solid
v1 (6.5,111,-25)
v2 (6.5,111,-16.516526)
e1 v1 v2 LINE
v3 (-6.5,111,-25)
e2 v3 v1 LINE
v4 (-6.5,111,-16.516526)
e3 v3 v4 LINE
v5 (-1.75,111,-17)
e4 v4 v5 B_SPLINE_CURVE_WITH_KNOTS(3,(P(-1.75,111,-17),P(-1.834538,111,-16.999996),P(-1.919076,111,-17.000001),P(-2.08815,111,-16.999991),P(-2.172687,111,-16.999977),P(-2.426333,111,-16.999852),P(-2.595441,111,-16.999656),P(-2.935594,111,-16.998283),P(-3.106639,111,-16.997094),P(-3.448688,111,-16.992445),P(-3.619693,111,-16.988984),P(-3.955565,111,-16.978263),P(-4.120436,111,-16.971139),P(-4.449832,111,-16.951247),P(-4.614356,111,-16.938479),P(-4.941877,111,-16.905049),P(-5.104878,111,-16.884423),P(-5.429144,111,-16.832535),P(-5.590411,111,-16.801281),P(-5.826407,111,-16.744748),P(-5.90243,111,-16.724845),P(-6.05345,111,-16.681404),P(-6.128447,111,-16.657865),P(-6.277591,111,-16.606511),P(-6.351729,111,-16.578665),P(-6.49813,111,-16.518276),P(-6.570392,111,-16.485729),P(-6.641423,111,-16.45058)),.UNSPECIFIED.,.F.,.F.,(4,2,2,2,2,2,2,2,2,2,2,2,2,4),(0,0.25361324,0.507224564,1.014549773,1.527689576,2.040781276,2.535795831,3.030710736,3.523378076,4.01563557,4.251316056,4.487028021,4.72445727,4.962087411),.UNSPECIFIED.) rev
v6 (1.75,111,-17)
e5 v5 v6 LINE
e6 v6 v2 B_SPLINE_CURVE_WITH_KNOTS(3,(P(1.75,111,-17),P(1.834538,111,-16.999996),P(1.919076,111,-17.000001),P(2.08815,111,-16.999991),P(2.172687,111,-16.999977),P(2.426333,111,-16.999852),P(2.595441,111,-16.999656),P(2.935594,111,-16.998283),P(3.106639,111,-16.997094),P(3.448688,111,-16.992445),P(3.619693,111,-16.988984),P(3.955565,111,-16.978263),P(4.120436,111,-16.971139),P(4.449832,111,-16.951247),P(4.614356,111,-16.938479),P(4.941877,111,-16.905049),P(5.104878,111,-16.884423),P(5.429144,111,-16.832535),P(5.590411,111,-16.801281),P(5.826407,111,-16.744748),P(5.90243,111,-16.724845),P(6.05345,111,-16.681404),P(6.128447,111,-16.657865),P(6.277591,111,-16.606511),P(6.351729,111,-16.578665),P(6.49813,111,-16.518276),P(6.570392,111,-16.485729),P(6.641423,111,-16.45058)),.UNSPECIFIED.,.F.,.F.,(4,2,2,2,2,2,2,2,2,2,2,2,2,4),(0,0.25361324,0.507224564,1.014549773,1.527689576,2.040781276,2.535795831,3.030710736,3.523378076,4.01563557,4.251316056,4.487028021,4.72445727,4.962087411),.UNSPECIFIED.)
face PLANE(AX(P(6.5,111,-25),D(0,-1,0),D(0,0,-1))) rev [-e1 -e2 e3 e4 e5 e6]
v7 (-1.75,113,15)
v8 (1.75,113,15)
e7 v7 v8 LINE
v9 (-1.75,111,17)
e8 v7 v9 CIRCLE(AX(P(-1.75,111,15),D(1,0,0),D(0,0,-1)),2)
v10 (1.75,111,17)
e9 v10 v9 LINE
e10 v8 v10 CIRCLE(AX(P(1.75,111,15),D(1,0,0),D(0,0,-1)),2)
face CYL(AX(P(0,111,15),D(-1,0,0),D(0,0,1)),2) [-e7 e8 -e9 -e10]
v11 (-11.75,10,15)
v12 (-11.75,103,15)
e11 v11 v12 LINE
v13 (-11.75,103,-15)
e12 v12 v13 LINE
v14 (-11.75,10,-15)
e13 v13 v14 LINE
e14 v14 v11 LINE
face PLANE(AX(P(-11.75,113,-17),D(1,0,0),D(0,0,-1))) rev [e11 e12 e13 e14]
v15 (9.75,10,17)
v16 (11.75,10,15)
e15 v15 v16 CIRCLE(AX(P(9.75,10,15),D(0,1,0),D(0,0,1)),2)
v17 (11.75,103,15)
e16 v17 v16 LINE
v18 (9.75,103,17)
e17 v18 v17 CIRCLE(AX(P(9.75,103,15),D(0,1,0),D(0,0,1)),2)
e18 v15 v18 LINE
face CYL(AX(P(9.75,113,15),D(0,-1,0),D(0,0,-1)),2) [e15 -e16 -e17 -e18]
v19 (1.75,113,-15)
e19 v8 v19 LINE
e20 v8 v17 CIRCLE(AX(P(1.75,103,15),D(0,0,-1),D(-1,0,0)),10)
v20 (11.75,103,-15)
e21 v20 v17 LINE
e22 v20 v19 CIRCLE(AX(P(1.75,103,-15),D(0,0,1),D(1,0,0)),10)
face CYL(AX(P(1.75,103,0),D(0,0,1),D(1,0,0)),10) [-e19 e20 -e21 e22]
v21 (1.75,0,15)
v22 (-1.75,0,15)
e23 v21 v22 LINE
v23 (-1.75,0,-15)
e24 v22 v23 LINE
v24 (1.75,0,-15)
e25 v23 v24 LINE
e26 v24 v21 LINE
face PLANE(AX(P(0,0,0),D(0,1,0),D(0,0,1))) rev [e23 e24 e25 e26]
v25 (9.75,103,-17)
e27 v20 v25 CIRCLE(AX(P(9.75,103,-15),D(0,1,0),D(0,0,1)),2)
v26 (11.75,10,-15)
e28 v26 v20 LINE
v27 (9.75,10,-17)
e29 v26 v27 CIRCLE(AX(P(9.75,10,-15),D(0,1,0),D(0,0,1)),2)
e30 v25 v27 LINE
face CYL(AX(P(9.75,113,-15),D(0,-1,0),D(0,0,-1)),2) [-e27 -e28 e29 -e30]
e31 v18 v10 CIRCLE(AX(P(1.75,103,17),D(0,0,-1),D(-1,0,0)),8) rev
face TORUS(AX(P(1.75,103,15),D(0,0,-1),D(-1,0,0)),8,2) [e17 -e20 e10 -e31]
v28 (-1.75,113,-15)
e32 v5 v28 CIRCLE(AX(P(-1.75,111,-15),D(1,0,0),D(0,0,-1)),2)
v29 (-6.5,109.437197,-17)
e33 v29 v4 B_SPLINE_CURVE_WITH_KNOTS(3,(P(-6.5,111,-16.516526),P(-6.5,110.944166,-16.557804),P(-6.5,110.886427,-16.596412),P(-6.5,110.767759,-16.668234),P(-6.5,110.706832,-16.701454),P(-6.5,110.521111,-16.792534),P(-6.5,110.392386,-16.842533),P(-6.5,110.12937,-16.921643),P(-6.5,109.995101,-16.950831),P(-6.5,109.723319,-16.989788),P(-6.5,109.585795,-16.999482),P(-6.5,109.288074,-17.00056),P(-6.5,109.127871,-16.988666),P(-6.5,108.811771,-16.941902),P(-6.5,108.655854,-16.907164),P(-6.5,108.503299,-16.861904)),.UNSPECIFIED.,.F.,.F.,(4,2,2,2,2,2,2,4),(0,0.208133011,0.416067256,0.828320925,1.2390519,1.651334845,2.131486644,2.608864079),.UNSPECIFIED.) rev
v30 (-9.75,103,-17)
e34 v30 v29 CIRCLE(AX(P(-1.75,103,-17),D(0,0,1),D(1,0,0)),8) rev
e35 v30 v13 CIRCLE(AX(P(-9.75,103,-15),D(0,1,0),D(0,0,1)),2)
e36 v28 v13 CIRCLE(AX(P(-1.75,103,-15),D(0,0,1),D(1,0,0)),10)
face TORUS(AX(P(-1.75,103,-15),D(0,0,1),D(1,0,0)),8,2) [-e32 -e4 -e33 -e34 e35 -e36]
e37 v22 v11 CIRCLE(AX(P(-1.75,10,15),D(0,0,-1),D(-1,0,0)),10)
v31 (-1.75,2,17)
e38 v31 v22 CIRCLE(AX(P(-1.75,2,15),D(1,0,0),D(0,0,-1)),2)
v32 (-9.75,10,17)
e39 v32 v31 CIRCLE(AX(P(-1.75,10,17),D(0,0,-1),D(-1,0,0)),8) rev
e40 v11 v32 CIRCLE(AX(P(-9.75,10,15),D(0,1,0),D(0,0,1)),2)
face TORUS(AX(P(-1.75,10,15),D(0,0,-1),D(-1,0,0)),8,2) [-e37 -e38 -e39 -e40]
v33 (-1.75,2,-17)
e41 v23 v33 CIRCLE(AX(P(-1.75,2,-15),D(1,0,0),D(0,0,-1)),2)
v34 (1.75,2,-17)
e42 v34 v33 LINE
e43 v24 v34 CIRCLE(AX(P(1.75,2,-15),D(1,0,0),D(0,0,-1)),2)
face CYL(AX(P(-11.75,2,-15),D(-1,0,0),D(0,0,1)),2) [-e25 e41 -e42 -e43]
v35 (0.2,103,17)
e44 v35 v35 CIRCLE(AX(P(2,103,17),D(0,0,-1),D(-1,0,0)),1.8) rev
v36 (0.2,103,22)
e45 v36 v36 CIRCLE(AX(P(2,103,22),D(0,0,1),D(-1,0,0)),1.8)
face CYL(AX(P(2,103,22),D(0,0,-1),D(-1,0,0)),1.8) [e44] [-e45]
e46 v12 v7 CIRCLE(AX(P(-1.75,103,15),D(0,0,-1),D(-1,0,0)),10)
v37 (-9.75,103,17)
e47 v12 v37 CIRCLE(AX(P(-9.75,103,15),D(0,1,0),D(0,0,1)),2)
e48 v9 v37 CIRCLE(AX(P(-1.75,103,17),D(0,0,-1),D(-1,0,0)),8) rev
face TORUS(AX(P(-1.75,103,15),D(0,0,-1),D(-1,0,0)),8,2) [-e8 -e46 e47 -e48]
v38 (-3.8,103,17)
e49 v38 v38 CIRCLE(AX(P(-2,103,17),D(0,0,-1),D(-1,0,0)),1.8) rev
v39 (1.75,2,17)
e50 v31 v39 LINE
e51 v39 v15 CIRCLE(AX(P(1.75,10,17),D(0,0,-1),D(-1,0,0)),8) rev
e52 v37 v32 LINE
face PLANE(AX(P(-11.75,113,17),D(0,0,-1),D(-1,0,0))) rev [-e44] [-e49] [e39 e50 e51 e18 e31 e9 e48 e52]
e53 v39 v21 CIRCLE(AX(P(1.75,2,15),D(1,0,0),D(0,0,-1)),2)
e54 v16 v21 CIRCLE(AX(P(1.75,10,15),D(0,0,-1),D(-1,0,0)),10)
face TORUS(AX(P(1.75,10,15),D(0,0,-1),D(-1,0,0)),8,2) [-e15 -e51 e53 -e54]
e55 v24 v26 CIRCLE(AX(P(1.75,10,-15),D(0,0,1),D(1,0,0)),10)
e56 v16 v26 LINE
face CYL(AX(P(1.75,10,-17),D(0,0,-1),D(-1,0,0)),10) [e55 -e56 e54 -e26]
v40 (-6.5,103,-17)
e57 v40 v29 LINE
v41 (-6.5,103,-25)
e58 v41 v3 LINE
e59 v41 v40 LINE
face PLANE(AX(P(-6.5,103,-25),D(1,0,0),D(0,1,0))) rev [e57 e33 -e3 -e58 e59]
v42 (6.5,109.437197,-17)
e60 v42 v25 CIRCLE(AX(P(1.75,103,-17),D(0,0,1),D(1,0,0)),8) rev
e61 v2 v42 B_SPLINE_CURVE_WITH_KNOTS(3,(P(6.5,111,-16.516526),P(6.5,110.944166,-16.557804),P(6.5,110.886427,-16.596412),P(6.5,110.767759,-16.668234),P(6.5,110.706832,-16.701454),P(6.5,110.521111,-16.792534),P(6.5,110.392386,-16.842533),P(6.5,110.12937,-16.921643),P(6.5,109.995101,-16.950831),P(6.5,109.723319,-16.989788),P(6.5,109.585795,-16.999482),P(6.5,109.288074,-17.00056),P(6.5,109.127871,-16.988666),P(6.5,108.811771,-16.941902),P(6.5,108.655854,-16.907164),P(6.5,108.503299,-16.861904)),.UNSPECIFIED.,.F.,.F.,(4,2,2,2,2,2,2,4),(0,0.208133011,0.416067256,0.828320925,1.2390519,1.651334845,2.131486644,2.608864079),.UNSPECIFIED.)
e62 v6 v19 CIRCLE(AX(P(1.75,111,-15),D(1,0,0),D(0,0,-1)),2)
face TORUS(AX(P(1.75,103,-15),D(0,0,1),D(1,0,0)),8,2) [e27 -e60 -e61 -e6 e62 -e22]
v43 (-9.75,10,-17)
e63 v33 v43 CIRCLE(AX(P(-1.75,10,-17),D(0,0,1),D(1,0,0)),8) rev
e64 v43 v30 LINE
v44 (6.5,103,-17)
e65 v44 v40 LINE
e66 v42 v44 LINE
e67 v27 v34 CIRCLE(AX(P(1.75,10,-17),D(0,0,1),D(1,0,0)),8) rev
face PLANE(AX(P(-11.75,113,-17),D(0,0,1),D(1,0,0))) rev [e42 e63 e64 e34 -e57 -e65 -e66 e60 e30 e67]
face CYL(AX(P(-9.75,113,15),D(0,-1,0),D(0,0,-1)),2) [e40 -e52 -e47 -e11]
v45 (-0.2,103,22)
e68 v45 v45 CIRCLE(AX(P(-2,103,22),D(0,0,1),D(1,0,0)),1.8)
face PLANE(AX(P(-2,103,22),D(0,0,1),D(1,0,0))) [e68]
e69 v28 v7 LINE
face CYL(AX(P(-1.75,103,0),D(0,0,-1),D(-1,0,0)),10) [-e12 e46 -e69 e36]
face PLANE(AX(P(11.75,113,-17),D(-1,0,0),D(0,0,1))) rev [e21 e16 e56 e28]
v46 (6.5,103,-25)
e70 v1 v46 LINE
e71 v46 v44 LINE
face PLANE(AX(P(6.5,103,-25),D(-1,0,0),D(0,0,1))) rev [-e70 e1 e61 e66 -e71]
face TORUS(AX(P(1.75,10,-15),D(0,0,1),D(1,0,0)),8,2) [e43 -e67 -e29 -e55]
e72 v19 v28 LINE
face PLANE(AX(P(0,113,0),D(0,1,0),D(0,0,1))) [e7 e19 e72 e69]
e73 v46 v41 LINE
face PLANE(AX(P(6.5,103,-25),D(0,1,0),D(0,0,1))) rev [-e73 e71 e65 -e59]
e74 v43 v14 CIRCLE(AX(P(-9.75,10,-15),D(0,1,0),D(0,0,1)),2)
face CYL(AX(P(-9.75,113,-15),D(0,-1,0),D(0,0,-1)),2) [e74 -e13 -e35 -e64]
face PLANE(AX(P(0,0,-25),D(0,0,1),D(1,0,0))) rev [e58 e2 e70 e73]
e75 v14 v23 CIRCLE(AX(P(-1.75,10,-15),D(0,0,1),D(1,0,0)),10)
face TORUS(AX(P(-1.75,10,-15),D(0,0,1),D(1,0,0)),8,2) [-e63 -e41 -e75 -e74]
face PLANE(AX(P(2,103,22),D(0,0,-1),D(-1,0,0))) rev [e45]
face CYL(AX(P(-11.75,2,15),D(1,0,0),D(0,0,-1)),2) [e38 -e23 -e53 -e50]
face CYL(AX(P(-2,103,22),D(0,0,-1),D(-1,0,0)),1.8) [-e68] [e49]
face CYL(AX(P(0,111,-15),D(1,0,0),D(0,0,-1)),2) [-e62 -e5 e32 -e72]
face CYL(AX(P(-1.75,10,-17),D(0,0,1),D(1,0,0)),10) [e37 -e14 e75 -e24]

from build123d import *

# Parameters (mm, degrees)
SKETCH_1_W      = 23.5
SKETCH_1_H      = 34
EXTRUDE_1_DEPTH = 113
SKETCH_2_R      = 1.8
EXTRUDE_2_DEPTH = 5
SKETCH_3_W      = 13
SKETCH_3_H      = 8
EXTRUDE_3_DEPTH = 8
FILLET_1_R      = 10
FILLET_2_R      = 2


with BuildPart() as part:
    # ｽｹｯﾁ1 → ﾎﾞｽ - 押し出し1 (new body)
    with BuildSketch(Plane(origin=(0, 0, 0), x_dir=(1, 0, 0), z_dir=(0, 1, 0))):
        Rectangle(SKETCH_1_W, SKETCH_1_H)
    extrude(amount=EXTRUDE_1_DEPTH)

    # ｽｹｯﾁ2 → ﾎﾞｽ - 押し出し2 (add)
    with BuildSketch(Plane.XY.offset(17)):
        with Locations(Location((-2, 103, 0), (0, 0, 180))):
            Circle(SKETCH_2_R)
        with Locations(Location((2, 103, 0), (0, 0, 180))):
            Circle(SKETCH_2_R)
    extrude(amount=EXTRUDE_2_DEPTH)

    # ｽｹｯﾁ3 → ﾎﾞｽ - 押し出し3 (add)
    with BuildSketch(Plane(origin=(0, 0, -17), x_dir=(-1, 0, 0), z_dir=(0, 0, -1))):
        with Locations((0, 107)):
            Rectangle(SKETCH_3_W, SKETCH_3_H)
    extrude(amount=EXTRUDE_3_DEPTH)

    # ﾌｨﾚｯﾄ1
    fillet_1_edges = [part.edges().sort_by_distance(p)[0] for p in [
        (-11.75, 113, 0),
        (11.75, 113, 0),
        (-11.75, 0, 0),
        (11.75, 0, 0),
    ]]
    fillet(fillet_1_edges, radius=FILLET_1_R)

    # ﾌｨﾚｯﾄ2
    # the kernel refuses this fillet: 2 mm, written as the material it takes off along each edge
    with BuildSketch(Plane(origin=(11.75, 10, -17), x_dir=(-1, 0, 0), z_dir=(0, 1, 0)), Plane(origin=(11.75, 10, 17), x_dir=(0, 0, -1), z_dir=(0, 1, 0))) as fillet_2_piece_1:
        with BuildLine():
            CenterArc((FILLET_2_R, FILLET_2_R), FILLET_2_R, 180, 90)
            Line((0, FILLET_2_R), (0, 0))
            Line((0, 0), (FILLET_2_R, 0))
        make_face()
    extrude(amount=93, mode=Mode.SUBTRACT)
    with BuildSketch(Plane(origin=(-1.75, 0, -17), x_dir=(0, 1, 0), z_dir=(1, 0, 0)), Plane(origin=(1.75, 113, 17), x_dir=(0, 0, -1), z_dir=(-1, 0, 0))) as fillet_2_piece_2:
        with BuildLine():
            CenterArc((FILLET_2_R, FILLET_2_R), FILLET_2_R, 180, 90)
            Line((0, FILLET_2_R), (0, 0))
            Line((0, 0), (FILLET_2_R, 0))
        make_face()
    extrude(amount=3.5, mode=Mode.SUBTRACT)
    with BuildSketch(Plane(origin=(-11.75, 10, -17), x_dir=(1, 0, 0), z_dir=(0, 1, 0)), Plane(origin=(-11.75, 10, 17), x_dir=(0, 0, -1), z_dir=(0, 1, 0))) as fillet_2_piece_3:
        with BuildLine():
            CenterArc((FILLET_2_R, -FILLET_2_R), FILLET_2_R, 90, 90)
            Line((0, -FILLET_2_R), (0, 0))
            Line((0, 0), (FILLET_2_R, 0))
        make_face()
    extrude(amount=93, mode=Mode.SUBTRACT)
    with BuildSketch(Plane(origin=(-1.75, 113, -17), x_dir=(0, -1, 0), z_dir=(1, 0, 0)), Plane(origin=(1.75, 0, 17), x_dir=(0, 0, -1), z_dir=(-1, 0, 0))) as fillet_2_piece_4:
        with BuildLine():
            CenterArc((FILLET_2_R, -FILLET_2_R), FILLET_2_R, 90, 90)
            Line((0, -FILLET_2_R), (0, 0))
            Line((0, 0), (FILLET_2_R, 0))
        make_face()
    extrude(amount=3.5, mode=Mode.SUBTRACT)
    with BuildSketch(Plane(origin=(1.75, 103, -17), x_dir=(0, 1, 0), z_dir=(-1, 0, 0))) as fillet_2_piece_5_section:
        with BuildLine():
            CenterArc((10 - FILLET_2_R, -FILLET_2_R), FILLET_2_R, 0, 90)
            Line((10, -FILLET_2_R), (10, 0))
            Line((10, 0), (10 - FILLET_2_R, 0))
        make_face()
    fillet_2_piece_5 = revolve(axis=Axis((1.75, 103, -17), (0, 0, -1)), revolution_arc=90, mode=Mode.PRIVATE)
    fillet_2_piece_5 = split(fillet_2_piece_5, bisect_by=Plane(origin=(4.101759822, 111, -16.527412799), z_dir=(0, 1, 0)), keep=Keep.TOP, mode=Mode.PRIVATE)
    fillet_2_piece_5 = split(fillet_2_piece_5, bisect_by=Plane(origin=(6.5, 112.1945957, -16.527412799), z_dir=(-1, 0, 0)), keep=Keep.TOP, mode=Mode.PRIVATE)
    add(fillet_2_piece_5, mode=Mode.SUBTRACT)
    with BuildSketch(Plane(origin=(1.75, 103, -17), x_dir=(0, 1, 0), z_dir=(-1, 0, 0))) as fillet_2_piece_6_section:
        with BuildLine():
            CenterArc((10 - FILLET_2_R, -FILLET_2_R), FILLET_2_R, 0, 90)
            Line((10, -FILLET_2_R), (10, 0))
            Line((10, 0), (10 - FILLET_2_R, 0))
        make_face()
    fillet_2_piece_6 = revolve(axis=Axis((1.75, 103, -17), (0, 0, -1)), revolution_arc=90, mode=Mode.PRIVATE)
    fillet_2_piece_6 = split(fillet_2_piece_6, bisect_by=Plane(origin=(9.944543227, 111, -16.429177526), z_dir=(0, -1, 0)), keep=Keep.TOP, mode=Mode.PRIVATE)
    fillet_2_piece_6 = split(fillet_2_piece_6, bisect_by=Plane(origin=(6.5, 107.664638262, -16.429177526), z_dir=(1, 0, 0)), keep=Keep.TOP, mode=Mode.PRIVATE)
    add(fillet_2_piece_6, mode=Mode.SUBTRACT)
    with BuildSketch(Plane(origin=(1.75, 103, -17), x_dir=(0, 1, 0), z_dir=(-1, 0, 0))) as fillet_2_piece_7_section:
        with BuildLine():
            CenterArc((10 - FILLET_2_R, -FILLET_2_R), FILLET_2_R, 0, 90)
            Line((10, -FILLET_2_R), (10, 0))
            Line((10, 0), (10 - FILLET_2_R, 0))
        make_face()
    fillet_2_piece_7 = revolve(axis=Axis((1.75, 103, -17), (0, 0, -1)), revolution_arc=90, mode=Mode.PRIVATE)
    fillet_2_piece_7 = split(fillet_2_piece_7, bisect_by=Plane(origin=(6.999362203, 111, -16.337935444), z_dir=(0, 1, 0)), keep=Keep.TOP, mode=Mode.PRIVATE)
    fillet_2_piece_7 = split(fillet_2_piece_7, bisect_by=Plane(origin=(6.5, 111.322531281, -16.337935444), z_dir=(1, 0, 0)), keep=Keep.TOP, mode=Mode.PRIVATE)
    add(fillet_2_piece_7, mode=Mode.SUBTRACT)
    with BuildSketch(Plane(origin=(-1.75, 103, -17), x_dir=(-1, 0, 0), z_dir=(0, -1, 0))) as fillet_2_piece_8_section:
        with BuildLine():
            CenterArc((10 - FILLET_2_R, -FILLET_2_R), FILLET_2_R, 0, 90)
            Line((10, -FILLET_2_R), (10, 0))
            Line((10, 0), (10 - FILLET_2_R, 0))
        make_face()
    fillet_2_piece_8 = revolve(axis=Axis((-1.75, 103, -17), (0, 0, -1)), revolution_arc=90, mode=Mode.PRIVATE)
    fillet_2_piece_8 = split(fillet_2_piece_8, bisect_by=Plane(origin=(-6.5, 107.664638263, -16.429177529), z_dir=(-1, 0, 0)), keep=Keep.TOP, mode=Mode.PRIVATE)
    fillet_2_piece_8 = split(fillet_2_piece_8, bisect_by=Plane(origin=(-9.94454323, 111, -16.429177529), z_dir=(0, -1, 0)), keep=Keep.TOP, mode=Mode.PRIVATE)
    add(fillet_2_piece_8, mode=Mode.SUBTRACT)
    with BuildSketch(Plane(origin=(-1.75, 103, -17), x_dir=(-1, 0, 0), z_dir=(0, -1, 0))) as fillet_2_piece_9_section:
        with BuildLine():
            CenterArc((10 - FILLET_2_R, -FILLET_2_R), FILLET_2_R, 0, 90)
            Line((10, -FILLET_2_R), (10, 0))
            Line((10, 0), (10 - FILLET_2_R, 0))
        make_face()
    fillet_2_piece_9 = revolve(axis=Axis((-1.75, 103, -17), (0, 0, -1)), revolution_arc=90, mode=Mode.PRIVATE)
    fillet_2_piece_9 = split(fillet_2_piece_9, bisect_by=Plane(origin=(-6.5, 111.32253137, -16.337935534), z_dir=(-1, 0, 0)), keep=Keep.TOP, mode=Mode.PRIVATE)
    fillet_2_piece_9 = split(fillet_2_piece_9, bisect_by=Plane(origin=(-6.999362106, 111, -16.337935534), z_dir=(0, 1, 0)), keep=Keep.TOP, mode=Mode.PRIVATE)
    add(fillet_2_piece_9, mode=Mode.SUBTRACT)
    with BuildSketch(Plane(origin=(-1.75, 103, -17), x_dir=(-1, 0, 0), z_dir=(0, -1, 0))) as fillet_2_piece_10_section:
        with BuildLine():
            CenterArc((10 - FILLET_2_R, -FILLET_2_R), FILLET_2_R, 0, 90)
            Line((10, -FILLET_2_R), (10, 0))
            Line((10, 0), (10 - FILLET_2_R, 0))
        make_face()
    fillet_2_piece_10 = revolve(axis=Axis((-1.75, 103, -17), (0, 0, -1)), revolution_arc=90, mode=Mode.PRIVATE)
    fillet_2_piece_10 = split(fillet_2_piece_10, bisect_by=Plane(origin=(-6.5, 112.194595792, -16.527412821), z_dir=(1, 0, 0)), keep=Keep.TOP, mode=Mode.PRIVATE)
    fillet_2_piece_10 = split(fillet_2_piece_10, bisect_by=Plane(origin=(-4.101760011, 111, -16.527412821), z_dir=(0, 1, 0)), keep=Keep.TOP, mode=Mode.PRIVATE)
    add(fillet_2_piece_10, mode=Mode.SUBTRACT)
    with BuildSketch(Plane(origin=(-1.75, 10, -17), x_dir=(-1, 0, 0), z_dir=(0, 1, 0))) as fillet_2_piece_11:
        with BuildLine():
            CenterArc((10 - FILLET_2_R, FILLET_2_R), FILLET_2_R, 270, 90)
            Line((10, FILLET_2_R), (10, 0))
            Line((10, 0), (10 - FILLET_2_R, 0))
        make_face()
    revolve(axis=Axis((-1.75, 10, -17), (0, 0, 1)), revolution_arc=90, mode=Mode.SUBTRACT)
    with BuildSketch(Plane(origin=(1.75, 10, -17), x_dir=(0, -1, 0), z_dir=(-1, 0, 0))) as fillet_2_piece_12:
        with BuildLine():
            CenterArc((10 - FILLET_2_R, FILLET_2_R), FILLET_2_R, 270, 90)
            Line((10, FILLET_2_R), (10, 0))
            Line((10, 0), (10 - FILLET_2_R, 0))
        make_face()
    revolve(axis=Axis((1.75, 10, -17), (0, 0, 1)), revolution_arc=90, mode=Mode.SUBTRACT)
    with BuildSketch(Plane(origin=(1.75, 103, 17), x_dir=(0, 1, 0), z_dir=(-1, 0, 0))) as fillet_2_piece_13:
        with BuildLine():
            CenterArc((10 - FILLET_2_R, FILLET_2_R), FILLET_2_R, 270, 90)
            Line((10 - FILLET_2_R, 0), (10, 0))
            Line((10, 0), (10, FILLET_2_R))
        make_face()
    revolve(axis=Axis((1.75, 103, 17), (0, 0, -1)), revolution_arc=90, mode=Mode.SUBTRACT)
    with BuildSketch(Plane(origin=(-1.75, 103, 17), x_dir=(-1, 0, 0), z_dir=(0, -1, 0))) as fillet_2_piece_14:
        with BuildLine():
            CenterArc((10 - FILLET_2_R, FILLET_2_R), FILLET_2_R, 270, 90)
            Line((10 - FILLET_2_R, 0), (10, 0))
            Line((10, 0), (10, FILLET_2_R))
        make_face()
    revolve(axis=Axis((-1.75, 103, 17), (0, 0, -1)), revolution_arc=90, mode=Mode.SUBTRACT)
    with BuildSketch(Plane(origin=(-1.75, 10, 17), x_dir=(-1, 0, 0), z_dir=(0, 1, 0))) as fillet_2_piece_15:
        with BuildLine():
            CenterArc((10 - FILLET_2_R, -FILLET_2_R), FILLET_2_R, 0, 90)
            Line((10 - FILLET_2_R, 0), (10, 0))
            Line((10, 0), (10, -FILLET_2_R))
        make_face()
    revolve(axis=Axis((-1.75, 10, 17), (0, 0, 1)), revolution_arc=90, mode=Mode.SUBTRACT)
    with BuildSketch(Plane(origin=(1.75, 10, 17), x_dir=(0, -1, 0), z_dir=(-1, 0, 0))) as fillet_2_piece_16:
        with BuildLine():
            CenterArc((10 - FILLET_2_R, -FILLET_2_R), FILLET_2_R, 0, 90)
            Line((10 - FILLET_2_R, 0), (10, 0))
            Line((10, 0), (10, -FILLET_2_R))
        make_face()
    revolve(axis=Axis((1.75, 10, 17), (0, 0, 1)), revolution_arc=90, mode=Mode.SUBTRACT)


solid = part.part
